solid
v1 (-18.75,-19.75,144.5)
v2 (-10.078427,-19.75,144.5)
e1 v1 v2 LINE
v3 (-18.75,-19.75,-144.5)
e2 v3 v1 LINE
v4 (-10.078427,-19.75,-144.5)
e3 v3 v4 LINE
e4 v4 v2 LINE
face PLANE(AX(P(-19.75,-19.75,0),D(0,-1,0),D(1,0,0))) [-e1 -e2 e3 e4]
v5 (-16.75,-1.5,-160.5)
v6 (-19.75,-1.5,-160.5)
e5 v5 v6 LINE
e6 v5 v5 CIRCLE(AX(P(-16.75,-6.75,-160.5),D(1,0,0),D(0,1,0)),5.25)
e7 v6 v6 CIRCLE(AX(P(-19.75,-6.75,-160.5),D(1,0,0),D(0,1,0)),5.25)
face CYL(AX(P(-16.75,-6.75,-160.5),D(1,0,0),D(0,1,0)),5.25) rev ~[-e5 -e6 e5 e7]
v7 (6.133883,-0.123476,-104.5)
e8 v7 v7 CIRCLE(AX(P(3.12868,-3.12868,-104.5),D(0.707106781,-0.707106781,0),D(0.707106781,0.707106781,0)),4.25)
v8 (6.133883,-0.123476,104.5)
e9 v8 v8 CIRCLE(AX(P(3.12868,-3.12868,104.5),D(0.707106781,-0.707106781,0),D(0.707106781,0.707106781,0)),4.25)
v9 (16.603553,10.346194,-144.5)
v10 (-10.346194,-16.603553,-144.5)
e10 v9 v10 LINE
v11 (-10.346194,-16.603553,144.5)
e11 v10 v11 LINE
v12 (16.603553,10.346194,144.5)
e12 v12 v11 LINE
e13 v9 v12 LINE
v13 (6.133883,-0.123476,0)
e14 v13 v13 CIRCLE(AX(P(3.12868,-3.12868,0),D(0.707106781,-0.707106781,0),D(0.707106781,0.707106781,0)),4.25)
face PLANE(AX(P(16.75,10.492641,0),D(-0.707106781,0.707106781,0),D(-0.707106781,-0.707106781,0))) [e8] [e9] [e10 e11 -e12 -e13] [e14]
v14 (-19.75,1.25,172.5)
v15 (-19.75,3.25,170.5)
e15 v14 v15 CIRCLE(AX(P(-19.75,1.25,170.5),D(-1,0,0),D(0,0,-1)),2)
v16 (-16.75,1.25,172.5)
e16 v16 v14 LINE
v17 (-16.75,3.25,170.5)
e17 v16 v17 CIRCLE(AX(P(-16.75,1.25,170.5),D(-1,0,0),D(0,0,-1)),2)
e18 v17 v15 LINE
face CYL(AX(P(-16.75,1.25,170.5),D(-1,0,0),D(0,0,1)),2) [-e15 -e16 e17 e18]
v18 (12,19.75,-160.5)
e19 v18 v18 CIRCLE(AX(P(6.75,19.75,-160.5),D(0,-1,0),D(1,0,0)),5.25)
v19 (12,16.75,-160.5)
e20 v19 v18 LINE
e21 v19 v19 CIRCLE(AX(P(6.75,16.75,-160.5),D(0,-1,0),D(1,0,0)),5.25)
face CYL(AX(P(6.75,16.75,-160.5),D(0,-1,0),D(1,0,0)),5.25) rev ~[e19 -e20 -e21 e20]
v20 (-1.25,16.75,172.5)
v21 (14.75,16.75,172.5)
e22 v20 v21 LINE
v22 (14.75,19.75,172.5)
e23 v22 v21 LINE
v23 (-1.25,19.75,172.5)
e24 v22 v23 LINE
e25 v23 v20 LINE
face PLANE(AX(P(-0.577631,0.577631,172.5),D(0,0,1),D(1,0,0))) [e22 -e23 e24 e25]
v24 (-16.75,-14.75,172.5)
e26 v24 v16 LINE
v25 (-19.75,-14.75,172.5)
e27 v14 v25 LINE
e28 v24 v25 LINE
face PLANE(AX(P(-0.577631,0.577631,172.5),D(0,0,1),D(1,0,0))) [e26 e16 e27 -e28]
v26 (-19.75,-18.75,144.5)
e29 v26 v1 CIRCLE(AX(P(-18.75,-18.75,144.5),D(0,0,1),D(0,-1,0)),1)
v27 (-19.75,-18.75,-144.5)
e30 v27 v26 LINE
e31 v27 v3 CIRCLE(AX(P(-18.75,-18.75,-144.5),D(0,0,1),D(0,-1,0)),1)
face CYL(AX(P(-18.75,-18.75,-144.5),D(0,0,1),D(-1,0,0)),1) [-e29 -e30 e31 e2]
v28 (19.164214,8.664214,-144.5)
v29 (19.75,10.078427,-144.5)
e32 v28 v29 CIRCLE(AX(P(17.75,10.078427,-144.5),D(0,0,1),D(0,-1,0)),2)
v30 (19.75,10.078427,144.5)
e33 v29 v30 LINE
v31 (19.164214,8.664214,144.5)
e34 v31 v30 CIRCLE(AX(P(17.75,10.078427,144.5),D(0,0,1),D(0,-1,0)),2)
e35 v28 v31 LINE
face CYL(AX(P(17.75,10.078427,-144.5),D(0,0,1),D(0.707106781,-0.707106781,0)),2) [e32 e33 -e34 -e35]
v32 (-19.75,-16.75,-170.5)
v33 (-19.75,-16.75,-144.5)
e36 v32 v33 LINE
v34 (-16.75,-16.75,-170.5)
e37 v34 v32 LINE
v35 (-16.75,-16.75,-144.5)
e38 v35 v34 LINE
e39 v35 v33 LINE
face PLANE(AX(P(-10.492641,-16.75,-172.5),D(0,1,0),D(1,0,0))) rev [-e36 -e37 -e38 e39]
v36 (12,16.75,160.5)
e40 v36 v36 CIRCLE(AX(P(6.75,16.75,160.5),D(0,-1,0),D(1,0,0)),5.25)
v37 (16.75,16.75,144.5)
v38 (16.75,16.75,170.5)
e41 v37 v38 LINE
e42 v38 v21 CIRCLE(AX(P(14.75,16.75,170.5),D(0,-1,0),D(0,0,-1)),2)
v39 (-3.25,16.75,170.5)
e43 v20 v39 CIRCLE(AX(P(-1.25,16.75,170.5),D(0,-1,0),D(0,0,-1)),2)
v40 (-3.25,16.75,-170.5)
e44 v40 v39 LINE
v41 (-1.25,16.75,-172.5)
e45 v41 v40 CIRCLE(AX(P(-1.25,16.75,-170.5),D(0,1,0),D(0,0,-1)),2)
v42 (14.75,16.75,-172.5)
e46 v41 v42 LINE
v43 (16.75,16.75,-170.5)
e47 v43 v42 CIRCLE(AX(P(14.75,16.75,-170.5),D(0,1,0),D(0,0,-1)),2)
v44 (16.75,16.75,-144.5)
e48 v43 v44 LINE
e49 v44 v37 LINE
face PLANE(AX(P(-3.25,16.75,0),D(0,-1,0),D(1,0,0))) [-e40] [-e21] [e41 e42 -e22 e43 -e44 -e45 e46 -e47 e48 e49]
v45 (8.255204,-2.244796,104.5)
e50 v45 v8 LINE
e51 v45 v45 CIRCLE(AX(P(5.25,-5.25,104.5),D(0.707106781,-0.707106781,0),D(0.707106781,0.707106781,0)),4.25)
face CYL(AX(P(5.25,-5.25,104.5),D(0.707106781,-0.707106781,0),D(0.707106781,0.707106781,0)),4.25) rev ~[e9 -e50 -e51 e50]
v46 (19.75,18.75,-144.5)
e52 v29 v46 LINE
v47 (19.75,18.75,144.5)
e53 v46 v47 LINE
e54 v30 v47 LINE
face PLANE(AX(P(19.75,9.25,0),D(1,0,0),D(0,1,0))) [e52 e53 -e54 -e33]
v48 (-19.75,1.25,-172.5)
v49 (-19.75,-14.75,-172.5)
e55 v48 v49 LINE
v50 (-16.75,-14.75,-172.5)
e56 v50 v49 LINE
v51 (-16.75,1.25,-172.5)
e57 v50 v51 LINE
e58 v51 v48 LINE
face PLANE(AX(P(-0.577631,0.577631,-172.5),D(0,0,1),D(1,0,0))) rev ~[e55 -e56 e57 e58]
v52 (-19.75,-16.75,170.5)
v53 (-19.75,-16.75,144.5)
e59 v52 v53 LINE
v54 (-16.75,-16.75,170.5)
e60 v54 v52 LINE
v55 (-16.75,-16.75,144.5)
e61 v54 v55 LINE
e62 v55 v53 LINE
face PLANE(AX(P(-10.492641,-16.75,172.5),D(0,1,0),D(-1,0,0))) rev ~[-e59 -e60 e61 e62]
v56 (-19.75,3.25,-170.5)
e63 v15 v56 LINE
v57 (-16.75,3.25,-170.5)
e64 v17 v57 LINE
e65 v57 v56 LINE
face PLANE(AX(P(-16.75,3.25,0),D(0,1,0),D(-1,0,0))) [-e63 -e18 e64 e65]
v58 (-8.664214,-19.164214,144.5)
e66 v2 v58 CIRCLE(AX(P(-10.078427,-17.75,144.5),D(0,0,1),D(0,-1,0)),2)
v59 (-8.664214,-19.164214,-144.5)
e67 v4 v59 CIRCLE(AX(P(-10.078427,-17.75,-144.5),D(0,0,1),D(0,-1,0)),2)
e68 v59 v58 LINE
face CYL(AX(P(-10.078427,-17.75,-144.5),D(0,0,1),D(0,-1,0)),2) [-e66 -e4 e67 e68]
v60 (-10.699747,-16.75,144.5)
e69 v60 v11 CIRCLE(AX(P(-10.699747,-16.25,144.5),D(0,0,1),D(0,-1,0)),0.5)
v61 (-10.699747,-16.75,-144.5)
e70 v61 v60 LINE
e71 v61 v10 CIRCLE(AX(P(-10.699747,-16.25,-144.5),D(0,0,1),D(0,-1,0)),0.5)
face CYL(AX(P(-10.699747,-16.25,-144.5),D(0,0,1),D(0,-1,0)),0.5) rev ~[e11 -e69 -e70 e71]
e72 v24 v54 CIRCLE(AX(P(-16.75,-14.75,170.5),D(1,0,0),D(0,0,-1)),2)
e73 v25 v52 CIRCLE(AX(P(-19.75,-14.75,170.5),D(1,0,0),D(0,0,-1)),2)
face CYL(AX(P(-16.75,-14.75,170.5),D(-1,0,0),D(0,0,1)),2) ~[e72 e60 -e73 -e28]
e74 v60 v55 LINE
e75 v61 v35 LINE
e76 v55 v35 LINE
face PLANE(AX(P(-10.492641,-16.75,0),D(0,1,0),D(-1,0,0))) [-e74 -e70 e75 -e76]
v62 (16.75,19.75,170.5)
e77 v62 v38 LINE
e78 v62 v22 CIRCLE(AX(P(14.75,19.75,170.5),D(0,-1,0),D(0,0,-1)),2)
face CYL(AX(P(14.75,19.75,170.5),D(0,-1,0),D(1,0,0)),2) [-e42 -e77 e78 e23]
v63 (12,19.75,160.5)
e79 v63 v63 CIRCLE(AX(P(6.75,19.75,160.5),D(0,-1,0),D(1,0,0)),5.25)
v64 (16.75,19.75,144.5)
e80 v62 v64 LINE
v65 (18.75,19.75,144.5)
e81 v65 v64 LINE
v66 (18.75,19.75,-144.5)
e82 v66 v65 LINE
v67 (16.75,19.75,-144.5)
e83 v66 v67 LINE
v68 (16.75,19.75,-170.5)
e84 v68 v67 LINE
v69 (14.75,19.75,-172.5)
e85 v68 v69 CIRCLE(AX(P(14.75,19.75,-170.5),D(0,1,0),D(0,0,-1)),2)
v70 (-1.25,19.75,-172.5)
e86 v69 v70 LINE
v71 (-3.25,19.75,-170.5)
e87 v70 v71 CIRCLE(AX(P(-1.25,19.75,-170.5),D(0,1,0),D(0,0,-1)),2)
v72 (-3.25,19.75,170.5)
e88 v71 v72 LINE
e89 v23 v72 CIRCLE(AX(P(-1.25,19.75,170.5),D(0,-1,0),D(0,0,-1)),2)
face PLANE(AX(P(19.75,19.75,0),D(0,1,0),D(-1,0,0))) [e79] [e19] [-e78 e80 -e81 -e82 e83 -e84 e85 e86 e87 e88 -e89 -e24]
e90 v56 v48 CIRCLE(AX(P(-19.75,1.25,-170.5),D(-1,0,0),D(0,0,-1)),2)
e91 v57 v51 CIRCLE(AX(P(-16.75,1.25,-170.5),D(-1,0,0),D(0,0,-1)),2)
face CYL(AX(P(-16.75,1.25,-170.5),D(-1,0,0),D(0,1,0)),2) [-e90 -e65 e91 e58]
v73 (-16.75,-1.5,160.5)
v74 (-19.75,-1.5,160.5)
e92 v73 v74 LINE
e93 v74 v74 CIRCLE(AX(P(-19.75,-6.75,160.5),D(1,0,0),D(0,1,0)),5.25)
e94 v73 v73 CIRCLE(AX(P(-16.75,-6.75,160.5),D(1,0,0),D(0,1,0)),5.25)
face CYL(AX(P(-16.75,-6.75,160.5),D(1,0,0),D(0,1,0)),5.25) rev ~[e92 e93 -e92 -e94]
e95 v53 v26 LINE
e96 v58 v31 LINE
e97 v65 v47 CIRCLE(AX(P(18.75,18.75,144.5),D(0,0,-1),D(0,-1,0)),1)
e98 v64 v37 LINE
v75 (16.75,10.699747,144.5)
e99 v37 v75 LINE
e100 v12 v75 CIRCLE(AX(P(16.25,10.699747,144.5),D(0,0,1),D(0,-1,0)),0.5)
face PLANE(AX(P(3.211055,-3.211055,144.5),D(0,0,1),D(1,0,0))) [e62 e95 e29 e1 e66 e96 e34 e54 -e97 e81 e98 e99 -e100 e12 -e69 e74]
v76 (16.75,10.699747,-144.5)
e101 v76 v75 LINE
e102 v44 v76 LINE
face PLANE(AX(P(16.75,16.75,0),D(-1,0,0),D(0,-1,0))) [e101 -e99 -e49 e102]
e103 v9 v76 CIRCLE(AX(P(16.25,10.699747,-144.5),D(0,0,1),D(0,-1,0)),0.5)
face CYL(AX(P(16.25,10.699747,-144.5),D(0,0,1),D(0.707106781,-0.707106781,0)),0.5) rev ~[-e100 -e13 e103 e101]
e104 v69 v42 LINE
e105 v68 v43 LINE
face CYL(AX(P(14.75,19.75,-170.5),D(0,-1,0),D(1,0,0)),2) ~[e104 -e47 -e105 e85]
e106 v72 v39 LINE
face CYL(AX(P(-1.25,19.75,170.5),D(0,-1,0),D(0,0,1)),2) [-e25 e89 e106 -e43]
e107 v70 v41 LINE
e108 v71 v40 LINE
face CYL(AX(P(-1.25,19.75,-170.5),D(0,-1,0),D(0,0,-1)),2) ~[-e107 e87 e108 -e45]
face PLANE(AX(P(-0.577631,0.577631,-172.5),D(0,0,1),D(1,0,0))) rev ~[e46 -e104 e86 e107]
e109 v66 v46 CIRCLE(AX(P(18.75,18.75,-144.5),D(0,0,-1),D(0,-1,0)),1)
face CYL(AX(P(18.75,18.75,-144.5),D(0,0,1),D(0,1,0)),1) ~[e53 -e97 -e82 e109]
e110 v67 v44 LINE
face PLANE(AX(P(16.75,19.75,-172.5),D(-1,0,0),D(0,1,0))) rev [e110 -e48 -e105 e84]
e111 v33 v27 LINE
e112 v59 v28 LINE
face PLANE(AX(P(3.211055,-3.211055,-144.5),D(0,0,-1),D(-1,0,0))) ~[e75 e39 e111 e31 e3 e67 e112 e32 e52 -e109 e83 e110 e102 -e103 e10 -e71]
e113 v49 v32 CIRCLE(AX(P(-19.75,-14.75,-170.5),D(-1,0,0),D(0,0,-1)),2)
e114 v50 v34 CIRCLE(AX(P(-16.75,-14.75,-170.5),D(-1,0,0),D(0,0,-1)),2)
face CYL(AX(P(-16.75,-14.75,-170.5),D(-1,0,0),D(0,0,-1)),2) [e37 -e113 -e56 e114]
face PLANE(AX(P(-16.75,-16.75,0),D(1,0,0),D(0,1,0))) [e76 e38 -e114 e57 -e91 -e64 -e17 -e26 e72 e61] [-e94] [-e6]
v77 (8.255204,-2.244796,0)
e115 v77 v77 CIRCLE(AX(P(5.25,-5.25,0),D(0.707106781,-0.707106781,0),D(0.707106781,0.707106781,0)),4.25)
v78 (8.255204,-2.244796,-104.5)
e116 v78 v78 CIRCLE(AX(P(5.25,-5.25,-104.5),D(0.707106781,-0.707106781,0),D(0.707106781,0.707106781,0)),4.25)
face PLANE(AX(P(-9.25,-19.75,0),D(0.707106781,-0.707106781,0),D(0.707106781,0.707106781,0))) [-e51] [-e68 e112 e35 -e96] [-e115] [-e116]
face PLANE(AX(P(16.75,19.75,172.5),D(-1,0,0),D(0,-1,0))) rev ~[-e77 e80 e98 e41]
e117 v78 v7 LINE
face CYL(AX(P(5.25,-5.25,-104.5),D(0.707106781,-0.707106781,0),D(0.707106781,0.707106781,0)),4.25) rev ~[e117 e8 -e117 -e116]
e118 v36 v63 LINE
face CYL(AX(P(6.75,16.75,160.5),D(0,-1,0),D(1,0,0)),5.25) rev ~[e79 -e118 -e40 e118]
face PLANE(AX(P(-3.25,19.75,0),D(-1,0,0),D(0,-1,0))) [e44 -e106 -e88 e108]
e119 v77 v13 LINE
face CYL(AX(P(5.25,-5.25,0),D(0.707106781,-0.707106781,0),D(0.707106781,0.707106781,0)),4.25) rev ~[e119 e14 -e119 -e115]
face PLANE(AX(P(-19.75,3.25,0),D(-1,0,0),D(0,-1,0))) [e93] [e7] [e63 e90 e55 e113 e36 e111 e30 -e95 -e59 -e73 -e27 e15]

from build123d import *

# Parameters (mm, degrees)
F1_DEPTH = 172.5
F3_DEPTH = 28
F4_R     = 4.25
F5_DEPTH = 25
F6_R     = 5.25
F7_DEPTH = 25
F8_R     = 5.25
F9_DEPTH = 25
F10_R    = 2
F11_R    = 0.5
F12_R    = 1


# Not quite as in the source:
# - a pattern or mirror of a feature is missing from the dataset's text; its kind, count and spacing are read off the source's solid


with BuildPart() as f1:
    # F0 (on Top) → F1 (new body, symmetric)
    with BuildSketch(Plane.XY):
        Polygon((-19.75, 3.25), (-19.75, -19.75), (-9.25, -19.75), (19.75, 9.25), (19.75, 19.75), (-3.25, 19.75), (-3.25, 16.75), (16.75, 16.75), (16.75, 10.4926406871), (-10.4926406871, -16.75), (-16.75, -16.75), (-16.75, 3.25), align=None)
    extrude(amount=F1_DEPTH, both=True)

    # F2 (on face) → F3 (cut)
    with BuildSketch(Plane.XY.offset(172.5)):
        Polygon((-10.4926406871, -16.75), (-16.75, -16.75), (-19.75, -16.75), (-19.75, -19.75), (-9.25, -19.75), (19.75, 9.25), (19.75, 19.75), (16.75, 19.75), (16.75, 16.75), (16.75, 10.4926406871), align=None)
    f3 = extrude(amount=-F3_DEPTH, mode=Mode.SUBTRACT)

    # F3_copies: F3 across plane
    add(f3.mirror(Plane(origin=(0, 0, 0), x_dir=(-1, 0, 0), z_dir=(0, 0, -1))), mode=Mode.SUBTRACT)

    # F4 (on face) → F5 (cut)
    with BuildSketch(Plane(origin=(5.25, -5.25, 0), x_dir=(0.7071067812, 0.7071067812, 0), z_dir=(0.7071067812, -0.7071067812, 0))):
        with Locations((0, 104.5)):
            Circle(F4_R)
        with Locations((0, -104.5)):
            Circle(F4_R)
        Circle(F4_R)
    extrude(amount=-F5_DEPTH, mode=Mode.SUBTRACT)

    # F6 (on face) → F7 (cut)
    with BuildSketch(Plane.YZ.offset(-16.75)):
        with Locations((-6.75, 160.5)):
            Circle(F6_R)
        with Locations((-6.75, -160.5)):
            Circle(F6_R)
    extrude(amount=-F7_DEPTH, mode=Mode.SUBTRACT)

    # F8 (on face) → F9 (cut)
    with BuildSketch(Plane.XZ.offset(-16.75)):
        with Locations((6.75, 160.5)):
            Circle(F8_R)
        with Locations((6.75, -160.5)):
            Circle(F8_R)
    extrude(amount=-F9_DEPTH, mode=Mode.SUBTRACT)

    # F10
    f10_edges = [f1.edges().sort_by_distance(p)[0] for p in [
        (-9.25, -19.75, 0),
        (19.75, 9.25, 0),
        (16.75, 18.25, 172.5),
        (-3.25, 18.25, 172.5),
        (-18.25, 3.25, 172.5),
        (-18.25, -16.75, 172.5),
        (-18.25, 3.25, -172.5),
        (-3.25, 18.25, -172.5),
        (-18.25, -16.75, -172.5),
        (16.75, 18.25, -172.5),
    ]]
    fillet(f10_edges, radius=F10_R)

    # F11
    f11_edges = [f1.edges().sort_by_distance(p)[0] for p in [
        (-10.492641, -16.75, 0),
        (16.75, 10.492641, 0),
    ]]
    fillet(f11_edges, radius=F11_R)

    # F12
    f12_edges = [f1.edges().sort_by_distance(p)[0] for p in [
        (-19.75, -19.75, 0),
        (19.75, 19.75, 0),
    ]]
    fillet(f12_edges, radius=F12_R)


solid = f1.part
